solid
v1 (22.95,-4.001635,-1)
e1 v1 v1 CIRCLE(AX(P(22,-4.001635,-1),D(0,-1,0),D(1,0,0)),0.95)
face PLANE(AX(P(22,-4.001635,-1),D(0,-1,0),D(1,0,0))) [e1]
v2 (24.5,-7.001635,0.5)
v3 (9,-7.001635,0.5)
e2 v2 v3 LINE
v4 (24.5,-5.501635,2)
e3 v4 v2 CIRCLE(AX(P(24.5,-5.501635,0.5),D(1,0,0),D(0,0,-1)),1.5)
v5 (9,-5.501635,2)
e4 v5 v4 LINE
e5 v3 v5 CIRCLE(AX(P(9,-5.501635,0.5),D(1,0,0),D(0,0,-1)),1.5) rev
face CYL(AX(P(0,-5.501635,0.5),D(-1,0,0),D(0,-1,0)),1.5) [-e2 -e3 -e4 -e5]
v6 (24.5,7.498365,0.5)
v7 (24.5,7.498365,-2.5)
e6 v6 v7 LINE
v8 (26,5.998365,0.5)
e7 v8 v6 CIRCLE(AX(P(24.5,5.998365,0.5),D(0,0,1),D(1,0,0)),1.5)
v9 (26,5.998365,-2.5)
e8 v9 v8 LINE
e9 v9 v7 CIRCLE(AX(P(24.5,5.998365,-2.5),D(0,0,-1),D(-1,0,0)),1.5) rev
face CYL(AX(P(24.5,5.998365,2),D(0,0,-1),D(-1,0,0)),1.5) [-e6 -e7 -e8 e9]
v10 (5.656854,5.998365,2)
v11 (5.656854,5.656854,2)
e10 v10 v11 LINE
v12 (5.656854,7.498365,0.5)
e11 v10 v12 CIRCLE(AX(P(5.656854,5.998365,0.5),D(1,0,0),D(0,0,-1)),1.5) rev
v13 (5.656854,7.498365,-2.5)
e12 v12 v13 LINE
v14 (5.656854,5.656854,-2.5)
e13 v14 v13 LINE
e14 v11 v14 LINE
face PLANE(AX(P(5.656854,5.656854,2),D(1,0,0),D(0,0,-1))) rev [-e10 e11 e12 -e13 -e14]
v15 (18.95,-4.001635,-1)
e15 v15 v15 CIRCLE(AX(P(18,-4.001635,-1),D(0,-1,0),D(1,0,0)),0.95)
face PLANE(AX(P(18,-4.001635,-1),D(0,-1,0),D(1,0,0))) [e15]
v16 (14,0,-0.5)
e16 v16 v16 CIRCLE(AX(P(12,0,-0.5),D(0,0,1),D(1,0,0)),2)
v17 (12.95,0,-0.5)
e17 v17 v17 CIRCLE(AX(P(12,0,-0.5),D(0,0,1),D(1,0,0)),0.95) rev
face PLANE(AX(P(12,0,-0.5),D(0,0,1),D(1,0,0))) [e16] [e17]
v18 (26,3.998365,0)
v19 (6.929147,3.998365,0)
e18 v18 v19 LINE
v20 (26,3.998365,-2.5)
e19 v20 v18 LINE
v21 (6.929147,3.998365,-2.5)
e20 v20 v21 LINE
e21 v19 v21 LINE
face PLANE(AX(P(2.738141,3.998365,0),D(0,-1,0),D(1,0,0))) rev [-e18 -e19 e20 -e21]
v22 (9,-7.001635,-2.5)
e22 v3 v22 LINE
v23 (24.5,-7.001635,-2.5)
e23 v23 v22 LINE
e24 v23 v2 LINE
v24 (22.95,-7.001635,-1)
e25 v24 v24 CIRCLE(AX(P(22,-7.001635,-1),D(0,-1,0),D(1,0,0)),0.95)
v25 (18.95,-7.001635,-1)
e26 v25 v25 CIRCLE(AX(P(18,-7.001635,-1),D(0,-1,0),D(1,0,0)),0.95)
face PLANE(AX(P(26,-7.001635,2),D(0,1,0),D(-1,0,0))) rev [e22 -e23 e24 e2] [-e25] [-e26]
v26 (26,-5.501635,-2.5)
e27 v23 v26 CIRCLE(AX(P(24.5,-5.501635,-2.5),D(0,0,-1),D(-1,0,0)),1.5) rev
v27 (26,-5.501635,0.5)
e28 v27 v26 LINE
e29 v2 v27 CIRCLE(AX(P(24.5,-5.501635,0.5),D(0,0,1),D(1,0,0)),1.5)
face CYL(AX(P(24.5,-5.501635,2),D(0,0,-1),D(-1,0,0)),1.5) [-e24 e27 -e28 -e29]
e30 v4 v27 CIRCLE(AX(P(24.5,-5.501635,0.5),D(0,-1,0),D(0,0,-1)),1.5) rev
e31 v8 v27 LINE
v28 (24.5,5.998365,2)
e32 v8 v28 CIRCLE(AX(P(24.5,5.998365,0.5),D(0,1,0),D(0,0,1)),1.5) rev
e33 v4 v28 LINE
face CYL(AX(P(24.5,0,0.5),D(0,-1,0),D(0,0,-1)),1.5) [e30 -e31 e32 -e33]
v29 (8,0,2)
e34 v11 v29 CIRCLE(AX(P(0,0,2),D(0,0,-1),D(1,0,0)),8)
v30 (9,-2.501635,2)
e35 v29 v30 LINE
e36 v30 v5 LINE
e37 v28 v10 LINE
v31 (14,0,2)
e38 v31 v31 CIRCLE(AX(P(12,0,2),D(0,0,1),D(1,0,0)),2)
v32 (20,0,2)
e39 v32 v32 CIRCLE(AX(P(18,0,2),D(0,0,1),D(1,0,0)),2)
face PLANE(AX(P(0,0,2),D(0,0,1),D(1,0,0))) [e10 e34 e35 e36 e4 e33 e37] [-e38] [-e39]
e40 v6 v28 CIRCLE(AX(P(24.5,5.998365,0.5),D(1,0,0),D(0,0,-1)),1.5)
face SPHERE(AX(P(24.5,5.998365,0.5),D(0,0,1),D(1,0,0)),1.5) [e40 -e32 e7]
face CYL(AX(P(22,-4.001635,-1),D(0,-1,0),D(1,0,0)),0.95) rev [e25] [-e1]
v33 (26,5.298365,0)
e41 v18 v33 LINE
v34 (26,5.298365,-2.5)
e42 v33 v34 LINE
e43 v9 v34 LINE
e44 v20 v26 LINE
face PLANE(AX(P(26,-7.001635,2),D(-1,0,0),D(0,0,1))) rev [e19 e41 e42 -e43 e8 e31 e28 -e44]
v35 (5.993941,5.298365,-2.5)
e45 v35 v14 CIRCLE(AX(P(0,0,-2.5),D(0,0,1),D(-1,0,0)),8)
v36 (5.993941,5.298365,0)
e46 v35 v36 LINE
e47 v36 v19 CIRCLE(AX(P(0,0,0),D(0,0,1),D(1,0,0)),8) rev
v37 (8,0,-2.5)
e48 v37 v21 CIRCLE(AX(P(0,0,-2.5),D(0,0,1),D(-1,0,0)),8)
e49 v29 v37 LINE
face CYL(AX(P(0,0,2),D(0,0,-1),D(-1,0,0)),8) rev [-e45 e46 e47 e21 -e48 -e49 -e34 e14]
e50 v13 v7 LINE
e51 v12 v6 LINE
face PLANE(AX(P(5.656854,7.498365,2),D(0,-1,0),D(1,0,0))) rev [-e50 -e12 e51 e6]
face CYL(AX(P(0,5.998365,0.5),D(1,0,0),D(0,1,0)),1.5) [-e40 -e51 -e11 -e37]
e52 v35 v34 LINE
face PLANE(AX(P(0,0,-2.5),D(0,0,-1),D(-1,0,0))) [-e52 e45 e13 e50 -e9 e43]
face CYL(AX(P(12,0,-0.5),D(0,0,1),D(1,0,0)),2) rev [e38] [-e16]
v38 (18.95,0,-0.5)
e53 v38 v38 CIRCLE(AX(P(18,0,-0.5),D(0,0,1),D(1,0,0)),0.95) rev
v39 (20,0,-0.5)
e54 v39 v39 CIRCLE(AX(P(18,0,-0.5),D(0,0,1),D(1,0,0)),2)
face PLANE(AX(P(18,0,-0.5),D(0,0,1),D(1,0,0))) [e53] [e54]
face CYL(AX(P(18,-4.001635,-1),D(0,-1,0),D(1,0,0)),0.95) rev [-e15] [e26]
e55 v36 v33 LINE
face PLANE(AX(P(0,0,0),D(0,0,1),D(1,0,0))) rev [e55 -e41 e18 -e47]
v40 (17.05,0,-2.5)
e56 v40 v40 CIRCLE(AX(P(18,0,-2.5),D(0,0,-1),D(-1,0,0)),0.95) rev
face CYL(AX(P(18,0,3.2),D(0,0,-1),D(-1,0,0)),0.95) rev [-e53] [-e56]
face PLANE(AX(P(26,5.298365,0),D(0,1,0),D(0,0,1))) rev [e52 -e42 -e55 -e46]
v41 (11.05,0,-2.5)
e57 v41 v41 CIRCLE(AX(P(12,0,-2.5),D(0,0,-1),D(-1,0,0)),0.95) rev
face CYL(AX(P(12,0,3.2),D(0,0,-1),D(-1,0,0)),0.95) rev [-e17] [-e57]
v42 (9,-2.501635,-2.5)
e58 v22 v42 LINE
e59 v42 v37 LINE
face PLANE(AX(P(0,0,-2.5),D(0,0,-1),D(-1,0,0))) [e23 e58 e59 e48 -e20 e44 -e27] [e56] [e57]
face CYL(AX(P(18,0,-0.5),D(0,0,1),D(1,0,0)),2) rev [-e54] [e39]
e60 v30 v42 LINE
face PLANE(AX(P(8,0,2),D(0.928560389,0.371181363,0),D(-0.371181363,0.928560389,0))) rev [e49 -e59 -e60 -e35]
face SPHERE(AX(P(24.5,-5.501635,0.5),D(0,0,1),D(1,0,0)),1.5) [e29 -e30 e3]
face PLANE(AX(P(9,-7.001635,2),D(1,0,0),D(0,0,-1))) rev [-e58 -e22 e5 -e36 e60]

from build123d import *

# Parameters (mm, degrees)
BOSS_EXTRUDE1_DEPTH = 2
BOSS_EXTRUDE2_START = 2.5
BOSS_EXTRUDE2_DEPTH = 2.5
CUT_EXTRUDE1_DEPTH  = 2.5
BOSS_EXTRUDE3_DEPTH = 2.3
SKETCH9_R           = 2.1
CUT_EXTRUDE2_DEPTH  = 2.5
SKETCH10_R          = 2.5
BOSS_EXTRUDE4_DEPTH = 1.2
SKETCH11_R          = 0.95
CUT_EXTRUDE3_DEPTH  = 9.2
SKETCH12_R          = 2
CUT_EXTRUDE4_DEPTH  = 2.5
SKETCH14_W          = 20.343145751
SKETCH14_H          = 1.841510486
SKETCH14_W_2        = 17
SKETCH14_H_2        = 1.34163614
BOSS_EXTRUDE5_DEPTH = 1.2
FILLET1_R           = 1.5
SKETCH17_R          = 0.95
CUT_EXTRUDE5_DEPTH  = 3


# Read off the part's stored shape, not the designer's step: Boss-Extrude3
with BuildPart() as part:
    # Sketch5 → Boss-Extrude1 (new body)
    with BuildSketch(Plane.XY):
        with BuildLine():
            Line((8, 0), (9, -2.501635265))
            Line((9, -2.501635265), (9, -7.001635265))
            Line((9, -7.001635265), (26, -7.001635265))
            Line((26, -7.001635265), (26, 7.498364735))
            Line((26, 7.498364735), (5.656854249, 7.498364735))
            Line((5.656854249, 7.498364735), (5.656854249, 5.656854249))
            ThreePointArc((5.656854249, 5.656854249), (7.39103626, 3.061467459), (8, 0))
        make_face()
    extrude(amount=BOSS_EXTRUDE1_DEPTH)

    # Sketch6 → Boss-Extrude2 (add)
    with BuildSketch(Plane(origin=(0, 0, 0), x_dir=(-1, 0, 0), z_dir=(0, 0, -1)).offset(BOSS_EXTRUDE2_START)):
        with BuildLine():
            Line((-5.656854249, 7.498364735), (-5.656854249, 5.656854249))
            ThreePointArc((-5.656854249, 5.656854249), (-7.39103626, 3.061467459), (-8, 0))
            Line((-8, 0), (-9, -2.501635265))
            Line((-9, -2.501635265), (-9, -7.001635265))
            Line((-9, -7.001635265), (-26, -7.001635265))
            Line((-26, -7.001635265), (-26, 7.498364735))
            Line((-26, 7.498364735), (-5.656854249, 7.498364735))
        make_face()
    extrude(amount=-BOSS_EXTRUDE2_DEPTH)

    # Sketch7 → Cut-Extrude1 (cut)
    with BuildSketch(Plane(origin=(0, 0, -2.5), x_dir=(-1, 0, 0), z_dir=(0, 0, -1))):
        Polygon((-26, 5.298364735), (-2.738141148, 5.298364735), (-2.738141148, 3.998364735), (-29.849535112, 3.998364735), (-29.849535112, 5.298364735), align=None)
    extrude(amount=-CUT_EXTRUDE1_DEPTH, mode=Mode.SUBTRACT)

    # Boss-Extrude3 outline → Boss-Extrude3 (add)
    with BuildSketch(Plane(origin=(0, 0, -2.5), x_dir=(-1, 0, 0), z_dir=(0, 0, -1))):
        with BuildLine():
            Line((-9, -7.001635265), (-9, -5.659999125))
            Line((-9, -5.659999125), (0, -5.659998688))
            ThreePointArc((0, -5.659998688), (5.659998688, 0), (0, 5.659998688))
            Line((0, 5.659998688), (-5.656854249, 5.656854249))
            Line((-5.656854249, 5.656854249), (-5.656854249, 7.498364735))
            Line((-5.656854249, 7.498364735), (-26, 7.498364735))
            Line((-26, 7.498364735), (-26, -7.001635265))
            Line((-26, -7.001635265), (-9, -7.001635265))
        make_face()
    extrude(amount=BOSS_EXTRUDE3_DEPTH)

    # Sketch9 → Cut-Extrude2 (cut)
    with BuildSketch(Plane(origin=(0, 0, -4.8), x_dir=(-1, 0, 0), z_dir=(0, 0, -1))):
        Circle(SKETCH9_R)
    extrude(amount=-CUT_EXTRUDE2_DEPTH, mode=Mode.SUBTRACT)

    # Sketch10 → Boss-Extrude4 (add)
    with BuildSketch(Plane(origin=(0, 0, -4.8), x_dir=(-1, 0, 0), z_dir=(0, 0, -1))):
        with Locations((-12, 0)):
            Circle(SKETCH10_R)
        with Locations((-18, 0)):
            Circle(SKETCH10_R)
    extrude(amount=BOSS_EXTRUDE4_DEPTH)

    # Sketch11 → Cut-Extrude3 (cut)
    with BuildSketch(Plane(origin=(0, 0, -6), x_dir=(-1, 0, 0), z_dir=(0, 0, -1))):
        with Locations((-18, 0)):
            Circle(SKETCH11_R)
        with Locations((-12, 0)):
            Circle(SKETCH11_R)
    extrude(amount=-CUT_EXTRUDE3_DEPTH, mode=Mode.SUBTRACT)

    # Sketch12 → Cut-Extrude4 (cut)
    with BuildSketch(Plane.XY.offset(2)):
        with Locations((12, 0)):
            Circle(SKETCH12_R)
        with Locations((18, 0)):
            Circle(SKETCH12_R)
    extrude(amount=-CUT_EXTRUDE4_DEPTH, mode=Mode.SUBTRACT)

    # Sketch14 → Boss-Extrude5 (add)
    with BuildSketch(Plane(origin=(0, 0, -4.8), x_dir=(-1, 0, 0), z_dir=(0, 0, -1))):
        with Locations((-15.828427124, 6.577609492)):
            Rectangle(SKETCH14_W, SKETCH14_H)
        with Locations((-17.5, -6.330817195)):
            Rectangle(SKETCH14_W_2, SKETCH14_H_2)
    extrude(amount=BOSS_EXTRUDE5_DEPTH)

    # Fillet1
    # the kernel refuses this fillet: 1.5 mm, written as the material it takes off along each edge
    with BuildSketch(Plane(origin=(24.5, -5.501635265, 0.5), x_dir=(0, 0, 1), z_dir=(0, -1, 0))) as fillet1_piece_1_section:
        Polygon((0, 0), (FILLET1_R, 0), (FILLET1_R, -FILLET1_R), (0, -FILLET1_R), align=None)
    fillet1_piece_1 = extrude(amount=FILLET1_R, mode=Mode.PRIVATE)
    fillet1_piece_1 = fillet1_piece_1 - Plane(origin=(24.5, -5.501635265, 0.5), x_dir=(-0.7071067811865475, 0, -0.7071067811865475), z_dir=(0, -1, 0)) * Sphere(FILLET1_R, mode=Mode.PRIVATE)
    add(fillet1_piece_1, mode=Mode.SUBTRACT)
    with BuildSketch(Plane(origin=(24.5, 5.998364735, 0.5), x_dir=(0, 0, 1), z_dir=(0, 1, 0))) as fillet1_piece_2_section:
        Polygon((0, 0), (FILLET1_R, 0), (FILLET1_R, FILLET1_R), (0, FILLET1_R), align=None)
    fillet1_piece_2 = extrude(amount=FILLET1_R, mode=Mode.PRIVATE)
    fillet1_piece_2 = fillet1_piece_2 - Plane(origin=(24.5, 5.998364735, 0.5), x_dir=(-0.7071067811865475, 0, -0.7071067811865475), z_dir=(0, 1, 0)) * Sphere(FILLET1_R, mode=Mode.PRIVATE)
    add(fillet1_piece_2, mode=Mode.SUBTRACT)
    with BuildSketch(Plane(origin=(26, -5.501635265, 2), x_dir=(-1, 0, 0), z_dir=(0, 1, 0))) as fillet1_piece_3:
        with BuildLine():
            CenterArc((FILLET1_R, -FILLET1_R), FILLET1_R, 90, 90)
            Line((0, -FILLET1_R), (0, 0))
            Line((0, 0), (FILLET1_R, 0))
        make_face()
    extrude(amount=11.5, mode=Mode.SUBTRACT)
    with BuildSketch(Plane(origin=(26, -7.001635265, -2.5), x_dir=(-1, 0, 0), z_dir=(0, 0, 1))) as fillet1_piece_4:
        with BuildLine():
            CenterArc((FILLET1_R, -FILLET1_R), FILLET1_R, 90, 90)
            Line((0, -FILLET1_R), (0, 0))
            Line((0, 0), (FILLET1_R, 0))
        make_face()
    extrude(amount=3, mode=Mode.SUBTRACT)
    with BuildSketch(Plane(origin=(5.25, -7.001635265, 2), x_dir=(0, 1, 0), z_dir=(1, 0, 0))) as fillet1_piece_5:
        with BuildLine():
            CenterArc((FILLET1_R, -FILLET1_R), FILLET1_R, 90, 90)
            Line((0, -FILLET1_R), (0, 0))
            Line((0, 0), (FILLET1_R, 0))
        make_face()
    extrude(amount=19.25, mode=Mode.SUBTRACT)
    with BuildSketch(Plane(origin=(24.5, 7.498364735, 2), x_dir=(0, -1, 0), z_dir=(-1, 0, 0))) as fillet1_piece_6:
        with BuildLine():
            CenterArc((FILLET1_R, -FILLET1_R), FILLET1_R, 90, 90)
            Line((0, -FILLET1_R), (0, 0))
            Line((0, 0), (FILLET1_R, 0))
        make_face()
    extrude(amount=22.593145751, mode=Mode.SUBTRACT)
    with BuildSketch(Plane(origin=(26, 7.498364735, -2.5), x_dir=(-1, 0, 0), z_dir=(0, 0, 1))) as fillet1_piece_7:
        with BuildLine():
            CenterArc((FILLET1_R, FILLET1_R), FILLET1_R, 180, 90)
            Line((0, FILLET1_R), (0, 0))
            Line((0, 0), (FILLET1_R, 0))
        make_face()
    extrude(amount=3, mode=Mode.SUBTRACT)
    with BuildSketch(Plane(origin=(26, 7.498364735, -2.5), x_dir=(-1.0, -1.9174232572065026e-10, 0), z_dir=(0, 0, -1))) as fillet1_piece_8:
        with BuildLine():
            CenterArc((FILLET1_R, -FILLET1_R), FILLET1_R, 90.000000011, 90)
            Line((FILLET1_R * 1.9173522033e-10, -FILLET1_R), (0, 0))
            Line((0, 0), (FILLET1_R, 0))
        make_face()
    extrude(amount=2.3, mode=Mode.SUBTRACT)
    with BuildSketch(Plane(origin=(26, 7.498364735, -4.8), x_dir=(-1, 0, 0), z_dir=(0, 0, -1))) as fillet1_piece_9:
        with BuildLine():
            CenterArc((FILLET1_R, -FILLET1_R), FILLET1_R, 90, 90)
            Line((0, -FILLET1_R), (0, 0))
            Line((0, 0), (FILLET1_R, 0))
        make_face()
    extrude(amount=4.95, mode=Mode.SUBTRACT)
    with BuildSketch(Plane(origin=(26, -7.001635265, -2.5), x_dir=(-1.0, -1.9169850891861218e-10, 0), z_dir=(0, 0, -1))) as fillet1_piece_10:
        with BuildLine():
            CenterArc((FILLET1_R, FILLET1_R), FILLET1_R, 180.000000011, 90)
            Line((-FILLET1_R * 1.91707982785e-10, FILLET1_R), (0, 0))
            Line((0, 0), (FILLET1_R, 0))
        make_face()
    extrude(amount=2.3, mode=Mode.SUBTRACT)
    with BuildSketch(Plane(origin=(26, -7.001635265, -4.8), x_dir=(-1, 0, 0), z_dir=(0, 0, -1))) as fillet1_piece_11:
        with BuildLine():
            CenterArc((FILLET1_R, FILLET1_R), FILLET1_R, 180, 90)
            Line((0, FILLET1_R), (0, 0))
            Line((0, 0), (FILLET1_R, 0))
        make_face()
    extrude(amount=4.95, mode=Mode.SUBTRACT)

    # Sketch17 → Cut-Extrude5 (cut)
    with BuildSketch(Plane.XZ.offset(7.001635265)):
        with Locations((22, -1)):
            Circle(SKETCH17_R)
        with Locations((18, -1)):
            Circle(SKETCH17_R)
    extrude(amount=-CUT_EXTRUDE5_DEPTH, mode=Mode.SUBTRACT)


with BuildPart() as body_2:
    # Split1: the piece on the far side of the plane
    add(part.part)
    split(bisect_by=Plane(origin=(0, 0, -2.5), x_dir=(-1, 0, 0), z_dir=(0, 0, -1)), keep=Keep.BOTTOM)


with BuildPart() as part_1:
    add(part.part)

    # Split1
    split(bisect_by=Plane(origin=(0, 0, -2.5), x_dir=(-1, 0, 0), z_dir=(0, 0, -1)), keep=Keep.TOP)


solid = body_2.part
